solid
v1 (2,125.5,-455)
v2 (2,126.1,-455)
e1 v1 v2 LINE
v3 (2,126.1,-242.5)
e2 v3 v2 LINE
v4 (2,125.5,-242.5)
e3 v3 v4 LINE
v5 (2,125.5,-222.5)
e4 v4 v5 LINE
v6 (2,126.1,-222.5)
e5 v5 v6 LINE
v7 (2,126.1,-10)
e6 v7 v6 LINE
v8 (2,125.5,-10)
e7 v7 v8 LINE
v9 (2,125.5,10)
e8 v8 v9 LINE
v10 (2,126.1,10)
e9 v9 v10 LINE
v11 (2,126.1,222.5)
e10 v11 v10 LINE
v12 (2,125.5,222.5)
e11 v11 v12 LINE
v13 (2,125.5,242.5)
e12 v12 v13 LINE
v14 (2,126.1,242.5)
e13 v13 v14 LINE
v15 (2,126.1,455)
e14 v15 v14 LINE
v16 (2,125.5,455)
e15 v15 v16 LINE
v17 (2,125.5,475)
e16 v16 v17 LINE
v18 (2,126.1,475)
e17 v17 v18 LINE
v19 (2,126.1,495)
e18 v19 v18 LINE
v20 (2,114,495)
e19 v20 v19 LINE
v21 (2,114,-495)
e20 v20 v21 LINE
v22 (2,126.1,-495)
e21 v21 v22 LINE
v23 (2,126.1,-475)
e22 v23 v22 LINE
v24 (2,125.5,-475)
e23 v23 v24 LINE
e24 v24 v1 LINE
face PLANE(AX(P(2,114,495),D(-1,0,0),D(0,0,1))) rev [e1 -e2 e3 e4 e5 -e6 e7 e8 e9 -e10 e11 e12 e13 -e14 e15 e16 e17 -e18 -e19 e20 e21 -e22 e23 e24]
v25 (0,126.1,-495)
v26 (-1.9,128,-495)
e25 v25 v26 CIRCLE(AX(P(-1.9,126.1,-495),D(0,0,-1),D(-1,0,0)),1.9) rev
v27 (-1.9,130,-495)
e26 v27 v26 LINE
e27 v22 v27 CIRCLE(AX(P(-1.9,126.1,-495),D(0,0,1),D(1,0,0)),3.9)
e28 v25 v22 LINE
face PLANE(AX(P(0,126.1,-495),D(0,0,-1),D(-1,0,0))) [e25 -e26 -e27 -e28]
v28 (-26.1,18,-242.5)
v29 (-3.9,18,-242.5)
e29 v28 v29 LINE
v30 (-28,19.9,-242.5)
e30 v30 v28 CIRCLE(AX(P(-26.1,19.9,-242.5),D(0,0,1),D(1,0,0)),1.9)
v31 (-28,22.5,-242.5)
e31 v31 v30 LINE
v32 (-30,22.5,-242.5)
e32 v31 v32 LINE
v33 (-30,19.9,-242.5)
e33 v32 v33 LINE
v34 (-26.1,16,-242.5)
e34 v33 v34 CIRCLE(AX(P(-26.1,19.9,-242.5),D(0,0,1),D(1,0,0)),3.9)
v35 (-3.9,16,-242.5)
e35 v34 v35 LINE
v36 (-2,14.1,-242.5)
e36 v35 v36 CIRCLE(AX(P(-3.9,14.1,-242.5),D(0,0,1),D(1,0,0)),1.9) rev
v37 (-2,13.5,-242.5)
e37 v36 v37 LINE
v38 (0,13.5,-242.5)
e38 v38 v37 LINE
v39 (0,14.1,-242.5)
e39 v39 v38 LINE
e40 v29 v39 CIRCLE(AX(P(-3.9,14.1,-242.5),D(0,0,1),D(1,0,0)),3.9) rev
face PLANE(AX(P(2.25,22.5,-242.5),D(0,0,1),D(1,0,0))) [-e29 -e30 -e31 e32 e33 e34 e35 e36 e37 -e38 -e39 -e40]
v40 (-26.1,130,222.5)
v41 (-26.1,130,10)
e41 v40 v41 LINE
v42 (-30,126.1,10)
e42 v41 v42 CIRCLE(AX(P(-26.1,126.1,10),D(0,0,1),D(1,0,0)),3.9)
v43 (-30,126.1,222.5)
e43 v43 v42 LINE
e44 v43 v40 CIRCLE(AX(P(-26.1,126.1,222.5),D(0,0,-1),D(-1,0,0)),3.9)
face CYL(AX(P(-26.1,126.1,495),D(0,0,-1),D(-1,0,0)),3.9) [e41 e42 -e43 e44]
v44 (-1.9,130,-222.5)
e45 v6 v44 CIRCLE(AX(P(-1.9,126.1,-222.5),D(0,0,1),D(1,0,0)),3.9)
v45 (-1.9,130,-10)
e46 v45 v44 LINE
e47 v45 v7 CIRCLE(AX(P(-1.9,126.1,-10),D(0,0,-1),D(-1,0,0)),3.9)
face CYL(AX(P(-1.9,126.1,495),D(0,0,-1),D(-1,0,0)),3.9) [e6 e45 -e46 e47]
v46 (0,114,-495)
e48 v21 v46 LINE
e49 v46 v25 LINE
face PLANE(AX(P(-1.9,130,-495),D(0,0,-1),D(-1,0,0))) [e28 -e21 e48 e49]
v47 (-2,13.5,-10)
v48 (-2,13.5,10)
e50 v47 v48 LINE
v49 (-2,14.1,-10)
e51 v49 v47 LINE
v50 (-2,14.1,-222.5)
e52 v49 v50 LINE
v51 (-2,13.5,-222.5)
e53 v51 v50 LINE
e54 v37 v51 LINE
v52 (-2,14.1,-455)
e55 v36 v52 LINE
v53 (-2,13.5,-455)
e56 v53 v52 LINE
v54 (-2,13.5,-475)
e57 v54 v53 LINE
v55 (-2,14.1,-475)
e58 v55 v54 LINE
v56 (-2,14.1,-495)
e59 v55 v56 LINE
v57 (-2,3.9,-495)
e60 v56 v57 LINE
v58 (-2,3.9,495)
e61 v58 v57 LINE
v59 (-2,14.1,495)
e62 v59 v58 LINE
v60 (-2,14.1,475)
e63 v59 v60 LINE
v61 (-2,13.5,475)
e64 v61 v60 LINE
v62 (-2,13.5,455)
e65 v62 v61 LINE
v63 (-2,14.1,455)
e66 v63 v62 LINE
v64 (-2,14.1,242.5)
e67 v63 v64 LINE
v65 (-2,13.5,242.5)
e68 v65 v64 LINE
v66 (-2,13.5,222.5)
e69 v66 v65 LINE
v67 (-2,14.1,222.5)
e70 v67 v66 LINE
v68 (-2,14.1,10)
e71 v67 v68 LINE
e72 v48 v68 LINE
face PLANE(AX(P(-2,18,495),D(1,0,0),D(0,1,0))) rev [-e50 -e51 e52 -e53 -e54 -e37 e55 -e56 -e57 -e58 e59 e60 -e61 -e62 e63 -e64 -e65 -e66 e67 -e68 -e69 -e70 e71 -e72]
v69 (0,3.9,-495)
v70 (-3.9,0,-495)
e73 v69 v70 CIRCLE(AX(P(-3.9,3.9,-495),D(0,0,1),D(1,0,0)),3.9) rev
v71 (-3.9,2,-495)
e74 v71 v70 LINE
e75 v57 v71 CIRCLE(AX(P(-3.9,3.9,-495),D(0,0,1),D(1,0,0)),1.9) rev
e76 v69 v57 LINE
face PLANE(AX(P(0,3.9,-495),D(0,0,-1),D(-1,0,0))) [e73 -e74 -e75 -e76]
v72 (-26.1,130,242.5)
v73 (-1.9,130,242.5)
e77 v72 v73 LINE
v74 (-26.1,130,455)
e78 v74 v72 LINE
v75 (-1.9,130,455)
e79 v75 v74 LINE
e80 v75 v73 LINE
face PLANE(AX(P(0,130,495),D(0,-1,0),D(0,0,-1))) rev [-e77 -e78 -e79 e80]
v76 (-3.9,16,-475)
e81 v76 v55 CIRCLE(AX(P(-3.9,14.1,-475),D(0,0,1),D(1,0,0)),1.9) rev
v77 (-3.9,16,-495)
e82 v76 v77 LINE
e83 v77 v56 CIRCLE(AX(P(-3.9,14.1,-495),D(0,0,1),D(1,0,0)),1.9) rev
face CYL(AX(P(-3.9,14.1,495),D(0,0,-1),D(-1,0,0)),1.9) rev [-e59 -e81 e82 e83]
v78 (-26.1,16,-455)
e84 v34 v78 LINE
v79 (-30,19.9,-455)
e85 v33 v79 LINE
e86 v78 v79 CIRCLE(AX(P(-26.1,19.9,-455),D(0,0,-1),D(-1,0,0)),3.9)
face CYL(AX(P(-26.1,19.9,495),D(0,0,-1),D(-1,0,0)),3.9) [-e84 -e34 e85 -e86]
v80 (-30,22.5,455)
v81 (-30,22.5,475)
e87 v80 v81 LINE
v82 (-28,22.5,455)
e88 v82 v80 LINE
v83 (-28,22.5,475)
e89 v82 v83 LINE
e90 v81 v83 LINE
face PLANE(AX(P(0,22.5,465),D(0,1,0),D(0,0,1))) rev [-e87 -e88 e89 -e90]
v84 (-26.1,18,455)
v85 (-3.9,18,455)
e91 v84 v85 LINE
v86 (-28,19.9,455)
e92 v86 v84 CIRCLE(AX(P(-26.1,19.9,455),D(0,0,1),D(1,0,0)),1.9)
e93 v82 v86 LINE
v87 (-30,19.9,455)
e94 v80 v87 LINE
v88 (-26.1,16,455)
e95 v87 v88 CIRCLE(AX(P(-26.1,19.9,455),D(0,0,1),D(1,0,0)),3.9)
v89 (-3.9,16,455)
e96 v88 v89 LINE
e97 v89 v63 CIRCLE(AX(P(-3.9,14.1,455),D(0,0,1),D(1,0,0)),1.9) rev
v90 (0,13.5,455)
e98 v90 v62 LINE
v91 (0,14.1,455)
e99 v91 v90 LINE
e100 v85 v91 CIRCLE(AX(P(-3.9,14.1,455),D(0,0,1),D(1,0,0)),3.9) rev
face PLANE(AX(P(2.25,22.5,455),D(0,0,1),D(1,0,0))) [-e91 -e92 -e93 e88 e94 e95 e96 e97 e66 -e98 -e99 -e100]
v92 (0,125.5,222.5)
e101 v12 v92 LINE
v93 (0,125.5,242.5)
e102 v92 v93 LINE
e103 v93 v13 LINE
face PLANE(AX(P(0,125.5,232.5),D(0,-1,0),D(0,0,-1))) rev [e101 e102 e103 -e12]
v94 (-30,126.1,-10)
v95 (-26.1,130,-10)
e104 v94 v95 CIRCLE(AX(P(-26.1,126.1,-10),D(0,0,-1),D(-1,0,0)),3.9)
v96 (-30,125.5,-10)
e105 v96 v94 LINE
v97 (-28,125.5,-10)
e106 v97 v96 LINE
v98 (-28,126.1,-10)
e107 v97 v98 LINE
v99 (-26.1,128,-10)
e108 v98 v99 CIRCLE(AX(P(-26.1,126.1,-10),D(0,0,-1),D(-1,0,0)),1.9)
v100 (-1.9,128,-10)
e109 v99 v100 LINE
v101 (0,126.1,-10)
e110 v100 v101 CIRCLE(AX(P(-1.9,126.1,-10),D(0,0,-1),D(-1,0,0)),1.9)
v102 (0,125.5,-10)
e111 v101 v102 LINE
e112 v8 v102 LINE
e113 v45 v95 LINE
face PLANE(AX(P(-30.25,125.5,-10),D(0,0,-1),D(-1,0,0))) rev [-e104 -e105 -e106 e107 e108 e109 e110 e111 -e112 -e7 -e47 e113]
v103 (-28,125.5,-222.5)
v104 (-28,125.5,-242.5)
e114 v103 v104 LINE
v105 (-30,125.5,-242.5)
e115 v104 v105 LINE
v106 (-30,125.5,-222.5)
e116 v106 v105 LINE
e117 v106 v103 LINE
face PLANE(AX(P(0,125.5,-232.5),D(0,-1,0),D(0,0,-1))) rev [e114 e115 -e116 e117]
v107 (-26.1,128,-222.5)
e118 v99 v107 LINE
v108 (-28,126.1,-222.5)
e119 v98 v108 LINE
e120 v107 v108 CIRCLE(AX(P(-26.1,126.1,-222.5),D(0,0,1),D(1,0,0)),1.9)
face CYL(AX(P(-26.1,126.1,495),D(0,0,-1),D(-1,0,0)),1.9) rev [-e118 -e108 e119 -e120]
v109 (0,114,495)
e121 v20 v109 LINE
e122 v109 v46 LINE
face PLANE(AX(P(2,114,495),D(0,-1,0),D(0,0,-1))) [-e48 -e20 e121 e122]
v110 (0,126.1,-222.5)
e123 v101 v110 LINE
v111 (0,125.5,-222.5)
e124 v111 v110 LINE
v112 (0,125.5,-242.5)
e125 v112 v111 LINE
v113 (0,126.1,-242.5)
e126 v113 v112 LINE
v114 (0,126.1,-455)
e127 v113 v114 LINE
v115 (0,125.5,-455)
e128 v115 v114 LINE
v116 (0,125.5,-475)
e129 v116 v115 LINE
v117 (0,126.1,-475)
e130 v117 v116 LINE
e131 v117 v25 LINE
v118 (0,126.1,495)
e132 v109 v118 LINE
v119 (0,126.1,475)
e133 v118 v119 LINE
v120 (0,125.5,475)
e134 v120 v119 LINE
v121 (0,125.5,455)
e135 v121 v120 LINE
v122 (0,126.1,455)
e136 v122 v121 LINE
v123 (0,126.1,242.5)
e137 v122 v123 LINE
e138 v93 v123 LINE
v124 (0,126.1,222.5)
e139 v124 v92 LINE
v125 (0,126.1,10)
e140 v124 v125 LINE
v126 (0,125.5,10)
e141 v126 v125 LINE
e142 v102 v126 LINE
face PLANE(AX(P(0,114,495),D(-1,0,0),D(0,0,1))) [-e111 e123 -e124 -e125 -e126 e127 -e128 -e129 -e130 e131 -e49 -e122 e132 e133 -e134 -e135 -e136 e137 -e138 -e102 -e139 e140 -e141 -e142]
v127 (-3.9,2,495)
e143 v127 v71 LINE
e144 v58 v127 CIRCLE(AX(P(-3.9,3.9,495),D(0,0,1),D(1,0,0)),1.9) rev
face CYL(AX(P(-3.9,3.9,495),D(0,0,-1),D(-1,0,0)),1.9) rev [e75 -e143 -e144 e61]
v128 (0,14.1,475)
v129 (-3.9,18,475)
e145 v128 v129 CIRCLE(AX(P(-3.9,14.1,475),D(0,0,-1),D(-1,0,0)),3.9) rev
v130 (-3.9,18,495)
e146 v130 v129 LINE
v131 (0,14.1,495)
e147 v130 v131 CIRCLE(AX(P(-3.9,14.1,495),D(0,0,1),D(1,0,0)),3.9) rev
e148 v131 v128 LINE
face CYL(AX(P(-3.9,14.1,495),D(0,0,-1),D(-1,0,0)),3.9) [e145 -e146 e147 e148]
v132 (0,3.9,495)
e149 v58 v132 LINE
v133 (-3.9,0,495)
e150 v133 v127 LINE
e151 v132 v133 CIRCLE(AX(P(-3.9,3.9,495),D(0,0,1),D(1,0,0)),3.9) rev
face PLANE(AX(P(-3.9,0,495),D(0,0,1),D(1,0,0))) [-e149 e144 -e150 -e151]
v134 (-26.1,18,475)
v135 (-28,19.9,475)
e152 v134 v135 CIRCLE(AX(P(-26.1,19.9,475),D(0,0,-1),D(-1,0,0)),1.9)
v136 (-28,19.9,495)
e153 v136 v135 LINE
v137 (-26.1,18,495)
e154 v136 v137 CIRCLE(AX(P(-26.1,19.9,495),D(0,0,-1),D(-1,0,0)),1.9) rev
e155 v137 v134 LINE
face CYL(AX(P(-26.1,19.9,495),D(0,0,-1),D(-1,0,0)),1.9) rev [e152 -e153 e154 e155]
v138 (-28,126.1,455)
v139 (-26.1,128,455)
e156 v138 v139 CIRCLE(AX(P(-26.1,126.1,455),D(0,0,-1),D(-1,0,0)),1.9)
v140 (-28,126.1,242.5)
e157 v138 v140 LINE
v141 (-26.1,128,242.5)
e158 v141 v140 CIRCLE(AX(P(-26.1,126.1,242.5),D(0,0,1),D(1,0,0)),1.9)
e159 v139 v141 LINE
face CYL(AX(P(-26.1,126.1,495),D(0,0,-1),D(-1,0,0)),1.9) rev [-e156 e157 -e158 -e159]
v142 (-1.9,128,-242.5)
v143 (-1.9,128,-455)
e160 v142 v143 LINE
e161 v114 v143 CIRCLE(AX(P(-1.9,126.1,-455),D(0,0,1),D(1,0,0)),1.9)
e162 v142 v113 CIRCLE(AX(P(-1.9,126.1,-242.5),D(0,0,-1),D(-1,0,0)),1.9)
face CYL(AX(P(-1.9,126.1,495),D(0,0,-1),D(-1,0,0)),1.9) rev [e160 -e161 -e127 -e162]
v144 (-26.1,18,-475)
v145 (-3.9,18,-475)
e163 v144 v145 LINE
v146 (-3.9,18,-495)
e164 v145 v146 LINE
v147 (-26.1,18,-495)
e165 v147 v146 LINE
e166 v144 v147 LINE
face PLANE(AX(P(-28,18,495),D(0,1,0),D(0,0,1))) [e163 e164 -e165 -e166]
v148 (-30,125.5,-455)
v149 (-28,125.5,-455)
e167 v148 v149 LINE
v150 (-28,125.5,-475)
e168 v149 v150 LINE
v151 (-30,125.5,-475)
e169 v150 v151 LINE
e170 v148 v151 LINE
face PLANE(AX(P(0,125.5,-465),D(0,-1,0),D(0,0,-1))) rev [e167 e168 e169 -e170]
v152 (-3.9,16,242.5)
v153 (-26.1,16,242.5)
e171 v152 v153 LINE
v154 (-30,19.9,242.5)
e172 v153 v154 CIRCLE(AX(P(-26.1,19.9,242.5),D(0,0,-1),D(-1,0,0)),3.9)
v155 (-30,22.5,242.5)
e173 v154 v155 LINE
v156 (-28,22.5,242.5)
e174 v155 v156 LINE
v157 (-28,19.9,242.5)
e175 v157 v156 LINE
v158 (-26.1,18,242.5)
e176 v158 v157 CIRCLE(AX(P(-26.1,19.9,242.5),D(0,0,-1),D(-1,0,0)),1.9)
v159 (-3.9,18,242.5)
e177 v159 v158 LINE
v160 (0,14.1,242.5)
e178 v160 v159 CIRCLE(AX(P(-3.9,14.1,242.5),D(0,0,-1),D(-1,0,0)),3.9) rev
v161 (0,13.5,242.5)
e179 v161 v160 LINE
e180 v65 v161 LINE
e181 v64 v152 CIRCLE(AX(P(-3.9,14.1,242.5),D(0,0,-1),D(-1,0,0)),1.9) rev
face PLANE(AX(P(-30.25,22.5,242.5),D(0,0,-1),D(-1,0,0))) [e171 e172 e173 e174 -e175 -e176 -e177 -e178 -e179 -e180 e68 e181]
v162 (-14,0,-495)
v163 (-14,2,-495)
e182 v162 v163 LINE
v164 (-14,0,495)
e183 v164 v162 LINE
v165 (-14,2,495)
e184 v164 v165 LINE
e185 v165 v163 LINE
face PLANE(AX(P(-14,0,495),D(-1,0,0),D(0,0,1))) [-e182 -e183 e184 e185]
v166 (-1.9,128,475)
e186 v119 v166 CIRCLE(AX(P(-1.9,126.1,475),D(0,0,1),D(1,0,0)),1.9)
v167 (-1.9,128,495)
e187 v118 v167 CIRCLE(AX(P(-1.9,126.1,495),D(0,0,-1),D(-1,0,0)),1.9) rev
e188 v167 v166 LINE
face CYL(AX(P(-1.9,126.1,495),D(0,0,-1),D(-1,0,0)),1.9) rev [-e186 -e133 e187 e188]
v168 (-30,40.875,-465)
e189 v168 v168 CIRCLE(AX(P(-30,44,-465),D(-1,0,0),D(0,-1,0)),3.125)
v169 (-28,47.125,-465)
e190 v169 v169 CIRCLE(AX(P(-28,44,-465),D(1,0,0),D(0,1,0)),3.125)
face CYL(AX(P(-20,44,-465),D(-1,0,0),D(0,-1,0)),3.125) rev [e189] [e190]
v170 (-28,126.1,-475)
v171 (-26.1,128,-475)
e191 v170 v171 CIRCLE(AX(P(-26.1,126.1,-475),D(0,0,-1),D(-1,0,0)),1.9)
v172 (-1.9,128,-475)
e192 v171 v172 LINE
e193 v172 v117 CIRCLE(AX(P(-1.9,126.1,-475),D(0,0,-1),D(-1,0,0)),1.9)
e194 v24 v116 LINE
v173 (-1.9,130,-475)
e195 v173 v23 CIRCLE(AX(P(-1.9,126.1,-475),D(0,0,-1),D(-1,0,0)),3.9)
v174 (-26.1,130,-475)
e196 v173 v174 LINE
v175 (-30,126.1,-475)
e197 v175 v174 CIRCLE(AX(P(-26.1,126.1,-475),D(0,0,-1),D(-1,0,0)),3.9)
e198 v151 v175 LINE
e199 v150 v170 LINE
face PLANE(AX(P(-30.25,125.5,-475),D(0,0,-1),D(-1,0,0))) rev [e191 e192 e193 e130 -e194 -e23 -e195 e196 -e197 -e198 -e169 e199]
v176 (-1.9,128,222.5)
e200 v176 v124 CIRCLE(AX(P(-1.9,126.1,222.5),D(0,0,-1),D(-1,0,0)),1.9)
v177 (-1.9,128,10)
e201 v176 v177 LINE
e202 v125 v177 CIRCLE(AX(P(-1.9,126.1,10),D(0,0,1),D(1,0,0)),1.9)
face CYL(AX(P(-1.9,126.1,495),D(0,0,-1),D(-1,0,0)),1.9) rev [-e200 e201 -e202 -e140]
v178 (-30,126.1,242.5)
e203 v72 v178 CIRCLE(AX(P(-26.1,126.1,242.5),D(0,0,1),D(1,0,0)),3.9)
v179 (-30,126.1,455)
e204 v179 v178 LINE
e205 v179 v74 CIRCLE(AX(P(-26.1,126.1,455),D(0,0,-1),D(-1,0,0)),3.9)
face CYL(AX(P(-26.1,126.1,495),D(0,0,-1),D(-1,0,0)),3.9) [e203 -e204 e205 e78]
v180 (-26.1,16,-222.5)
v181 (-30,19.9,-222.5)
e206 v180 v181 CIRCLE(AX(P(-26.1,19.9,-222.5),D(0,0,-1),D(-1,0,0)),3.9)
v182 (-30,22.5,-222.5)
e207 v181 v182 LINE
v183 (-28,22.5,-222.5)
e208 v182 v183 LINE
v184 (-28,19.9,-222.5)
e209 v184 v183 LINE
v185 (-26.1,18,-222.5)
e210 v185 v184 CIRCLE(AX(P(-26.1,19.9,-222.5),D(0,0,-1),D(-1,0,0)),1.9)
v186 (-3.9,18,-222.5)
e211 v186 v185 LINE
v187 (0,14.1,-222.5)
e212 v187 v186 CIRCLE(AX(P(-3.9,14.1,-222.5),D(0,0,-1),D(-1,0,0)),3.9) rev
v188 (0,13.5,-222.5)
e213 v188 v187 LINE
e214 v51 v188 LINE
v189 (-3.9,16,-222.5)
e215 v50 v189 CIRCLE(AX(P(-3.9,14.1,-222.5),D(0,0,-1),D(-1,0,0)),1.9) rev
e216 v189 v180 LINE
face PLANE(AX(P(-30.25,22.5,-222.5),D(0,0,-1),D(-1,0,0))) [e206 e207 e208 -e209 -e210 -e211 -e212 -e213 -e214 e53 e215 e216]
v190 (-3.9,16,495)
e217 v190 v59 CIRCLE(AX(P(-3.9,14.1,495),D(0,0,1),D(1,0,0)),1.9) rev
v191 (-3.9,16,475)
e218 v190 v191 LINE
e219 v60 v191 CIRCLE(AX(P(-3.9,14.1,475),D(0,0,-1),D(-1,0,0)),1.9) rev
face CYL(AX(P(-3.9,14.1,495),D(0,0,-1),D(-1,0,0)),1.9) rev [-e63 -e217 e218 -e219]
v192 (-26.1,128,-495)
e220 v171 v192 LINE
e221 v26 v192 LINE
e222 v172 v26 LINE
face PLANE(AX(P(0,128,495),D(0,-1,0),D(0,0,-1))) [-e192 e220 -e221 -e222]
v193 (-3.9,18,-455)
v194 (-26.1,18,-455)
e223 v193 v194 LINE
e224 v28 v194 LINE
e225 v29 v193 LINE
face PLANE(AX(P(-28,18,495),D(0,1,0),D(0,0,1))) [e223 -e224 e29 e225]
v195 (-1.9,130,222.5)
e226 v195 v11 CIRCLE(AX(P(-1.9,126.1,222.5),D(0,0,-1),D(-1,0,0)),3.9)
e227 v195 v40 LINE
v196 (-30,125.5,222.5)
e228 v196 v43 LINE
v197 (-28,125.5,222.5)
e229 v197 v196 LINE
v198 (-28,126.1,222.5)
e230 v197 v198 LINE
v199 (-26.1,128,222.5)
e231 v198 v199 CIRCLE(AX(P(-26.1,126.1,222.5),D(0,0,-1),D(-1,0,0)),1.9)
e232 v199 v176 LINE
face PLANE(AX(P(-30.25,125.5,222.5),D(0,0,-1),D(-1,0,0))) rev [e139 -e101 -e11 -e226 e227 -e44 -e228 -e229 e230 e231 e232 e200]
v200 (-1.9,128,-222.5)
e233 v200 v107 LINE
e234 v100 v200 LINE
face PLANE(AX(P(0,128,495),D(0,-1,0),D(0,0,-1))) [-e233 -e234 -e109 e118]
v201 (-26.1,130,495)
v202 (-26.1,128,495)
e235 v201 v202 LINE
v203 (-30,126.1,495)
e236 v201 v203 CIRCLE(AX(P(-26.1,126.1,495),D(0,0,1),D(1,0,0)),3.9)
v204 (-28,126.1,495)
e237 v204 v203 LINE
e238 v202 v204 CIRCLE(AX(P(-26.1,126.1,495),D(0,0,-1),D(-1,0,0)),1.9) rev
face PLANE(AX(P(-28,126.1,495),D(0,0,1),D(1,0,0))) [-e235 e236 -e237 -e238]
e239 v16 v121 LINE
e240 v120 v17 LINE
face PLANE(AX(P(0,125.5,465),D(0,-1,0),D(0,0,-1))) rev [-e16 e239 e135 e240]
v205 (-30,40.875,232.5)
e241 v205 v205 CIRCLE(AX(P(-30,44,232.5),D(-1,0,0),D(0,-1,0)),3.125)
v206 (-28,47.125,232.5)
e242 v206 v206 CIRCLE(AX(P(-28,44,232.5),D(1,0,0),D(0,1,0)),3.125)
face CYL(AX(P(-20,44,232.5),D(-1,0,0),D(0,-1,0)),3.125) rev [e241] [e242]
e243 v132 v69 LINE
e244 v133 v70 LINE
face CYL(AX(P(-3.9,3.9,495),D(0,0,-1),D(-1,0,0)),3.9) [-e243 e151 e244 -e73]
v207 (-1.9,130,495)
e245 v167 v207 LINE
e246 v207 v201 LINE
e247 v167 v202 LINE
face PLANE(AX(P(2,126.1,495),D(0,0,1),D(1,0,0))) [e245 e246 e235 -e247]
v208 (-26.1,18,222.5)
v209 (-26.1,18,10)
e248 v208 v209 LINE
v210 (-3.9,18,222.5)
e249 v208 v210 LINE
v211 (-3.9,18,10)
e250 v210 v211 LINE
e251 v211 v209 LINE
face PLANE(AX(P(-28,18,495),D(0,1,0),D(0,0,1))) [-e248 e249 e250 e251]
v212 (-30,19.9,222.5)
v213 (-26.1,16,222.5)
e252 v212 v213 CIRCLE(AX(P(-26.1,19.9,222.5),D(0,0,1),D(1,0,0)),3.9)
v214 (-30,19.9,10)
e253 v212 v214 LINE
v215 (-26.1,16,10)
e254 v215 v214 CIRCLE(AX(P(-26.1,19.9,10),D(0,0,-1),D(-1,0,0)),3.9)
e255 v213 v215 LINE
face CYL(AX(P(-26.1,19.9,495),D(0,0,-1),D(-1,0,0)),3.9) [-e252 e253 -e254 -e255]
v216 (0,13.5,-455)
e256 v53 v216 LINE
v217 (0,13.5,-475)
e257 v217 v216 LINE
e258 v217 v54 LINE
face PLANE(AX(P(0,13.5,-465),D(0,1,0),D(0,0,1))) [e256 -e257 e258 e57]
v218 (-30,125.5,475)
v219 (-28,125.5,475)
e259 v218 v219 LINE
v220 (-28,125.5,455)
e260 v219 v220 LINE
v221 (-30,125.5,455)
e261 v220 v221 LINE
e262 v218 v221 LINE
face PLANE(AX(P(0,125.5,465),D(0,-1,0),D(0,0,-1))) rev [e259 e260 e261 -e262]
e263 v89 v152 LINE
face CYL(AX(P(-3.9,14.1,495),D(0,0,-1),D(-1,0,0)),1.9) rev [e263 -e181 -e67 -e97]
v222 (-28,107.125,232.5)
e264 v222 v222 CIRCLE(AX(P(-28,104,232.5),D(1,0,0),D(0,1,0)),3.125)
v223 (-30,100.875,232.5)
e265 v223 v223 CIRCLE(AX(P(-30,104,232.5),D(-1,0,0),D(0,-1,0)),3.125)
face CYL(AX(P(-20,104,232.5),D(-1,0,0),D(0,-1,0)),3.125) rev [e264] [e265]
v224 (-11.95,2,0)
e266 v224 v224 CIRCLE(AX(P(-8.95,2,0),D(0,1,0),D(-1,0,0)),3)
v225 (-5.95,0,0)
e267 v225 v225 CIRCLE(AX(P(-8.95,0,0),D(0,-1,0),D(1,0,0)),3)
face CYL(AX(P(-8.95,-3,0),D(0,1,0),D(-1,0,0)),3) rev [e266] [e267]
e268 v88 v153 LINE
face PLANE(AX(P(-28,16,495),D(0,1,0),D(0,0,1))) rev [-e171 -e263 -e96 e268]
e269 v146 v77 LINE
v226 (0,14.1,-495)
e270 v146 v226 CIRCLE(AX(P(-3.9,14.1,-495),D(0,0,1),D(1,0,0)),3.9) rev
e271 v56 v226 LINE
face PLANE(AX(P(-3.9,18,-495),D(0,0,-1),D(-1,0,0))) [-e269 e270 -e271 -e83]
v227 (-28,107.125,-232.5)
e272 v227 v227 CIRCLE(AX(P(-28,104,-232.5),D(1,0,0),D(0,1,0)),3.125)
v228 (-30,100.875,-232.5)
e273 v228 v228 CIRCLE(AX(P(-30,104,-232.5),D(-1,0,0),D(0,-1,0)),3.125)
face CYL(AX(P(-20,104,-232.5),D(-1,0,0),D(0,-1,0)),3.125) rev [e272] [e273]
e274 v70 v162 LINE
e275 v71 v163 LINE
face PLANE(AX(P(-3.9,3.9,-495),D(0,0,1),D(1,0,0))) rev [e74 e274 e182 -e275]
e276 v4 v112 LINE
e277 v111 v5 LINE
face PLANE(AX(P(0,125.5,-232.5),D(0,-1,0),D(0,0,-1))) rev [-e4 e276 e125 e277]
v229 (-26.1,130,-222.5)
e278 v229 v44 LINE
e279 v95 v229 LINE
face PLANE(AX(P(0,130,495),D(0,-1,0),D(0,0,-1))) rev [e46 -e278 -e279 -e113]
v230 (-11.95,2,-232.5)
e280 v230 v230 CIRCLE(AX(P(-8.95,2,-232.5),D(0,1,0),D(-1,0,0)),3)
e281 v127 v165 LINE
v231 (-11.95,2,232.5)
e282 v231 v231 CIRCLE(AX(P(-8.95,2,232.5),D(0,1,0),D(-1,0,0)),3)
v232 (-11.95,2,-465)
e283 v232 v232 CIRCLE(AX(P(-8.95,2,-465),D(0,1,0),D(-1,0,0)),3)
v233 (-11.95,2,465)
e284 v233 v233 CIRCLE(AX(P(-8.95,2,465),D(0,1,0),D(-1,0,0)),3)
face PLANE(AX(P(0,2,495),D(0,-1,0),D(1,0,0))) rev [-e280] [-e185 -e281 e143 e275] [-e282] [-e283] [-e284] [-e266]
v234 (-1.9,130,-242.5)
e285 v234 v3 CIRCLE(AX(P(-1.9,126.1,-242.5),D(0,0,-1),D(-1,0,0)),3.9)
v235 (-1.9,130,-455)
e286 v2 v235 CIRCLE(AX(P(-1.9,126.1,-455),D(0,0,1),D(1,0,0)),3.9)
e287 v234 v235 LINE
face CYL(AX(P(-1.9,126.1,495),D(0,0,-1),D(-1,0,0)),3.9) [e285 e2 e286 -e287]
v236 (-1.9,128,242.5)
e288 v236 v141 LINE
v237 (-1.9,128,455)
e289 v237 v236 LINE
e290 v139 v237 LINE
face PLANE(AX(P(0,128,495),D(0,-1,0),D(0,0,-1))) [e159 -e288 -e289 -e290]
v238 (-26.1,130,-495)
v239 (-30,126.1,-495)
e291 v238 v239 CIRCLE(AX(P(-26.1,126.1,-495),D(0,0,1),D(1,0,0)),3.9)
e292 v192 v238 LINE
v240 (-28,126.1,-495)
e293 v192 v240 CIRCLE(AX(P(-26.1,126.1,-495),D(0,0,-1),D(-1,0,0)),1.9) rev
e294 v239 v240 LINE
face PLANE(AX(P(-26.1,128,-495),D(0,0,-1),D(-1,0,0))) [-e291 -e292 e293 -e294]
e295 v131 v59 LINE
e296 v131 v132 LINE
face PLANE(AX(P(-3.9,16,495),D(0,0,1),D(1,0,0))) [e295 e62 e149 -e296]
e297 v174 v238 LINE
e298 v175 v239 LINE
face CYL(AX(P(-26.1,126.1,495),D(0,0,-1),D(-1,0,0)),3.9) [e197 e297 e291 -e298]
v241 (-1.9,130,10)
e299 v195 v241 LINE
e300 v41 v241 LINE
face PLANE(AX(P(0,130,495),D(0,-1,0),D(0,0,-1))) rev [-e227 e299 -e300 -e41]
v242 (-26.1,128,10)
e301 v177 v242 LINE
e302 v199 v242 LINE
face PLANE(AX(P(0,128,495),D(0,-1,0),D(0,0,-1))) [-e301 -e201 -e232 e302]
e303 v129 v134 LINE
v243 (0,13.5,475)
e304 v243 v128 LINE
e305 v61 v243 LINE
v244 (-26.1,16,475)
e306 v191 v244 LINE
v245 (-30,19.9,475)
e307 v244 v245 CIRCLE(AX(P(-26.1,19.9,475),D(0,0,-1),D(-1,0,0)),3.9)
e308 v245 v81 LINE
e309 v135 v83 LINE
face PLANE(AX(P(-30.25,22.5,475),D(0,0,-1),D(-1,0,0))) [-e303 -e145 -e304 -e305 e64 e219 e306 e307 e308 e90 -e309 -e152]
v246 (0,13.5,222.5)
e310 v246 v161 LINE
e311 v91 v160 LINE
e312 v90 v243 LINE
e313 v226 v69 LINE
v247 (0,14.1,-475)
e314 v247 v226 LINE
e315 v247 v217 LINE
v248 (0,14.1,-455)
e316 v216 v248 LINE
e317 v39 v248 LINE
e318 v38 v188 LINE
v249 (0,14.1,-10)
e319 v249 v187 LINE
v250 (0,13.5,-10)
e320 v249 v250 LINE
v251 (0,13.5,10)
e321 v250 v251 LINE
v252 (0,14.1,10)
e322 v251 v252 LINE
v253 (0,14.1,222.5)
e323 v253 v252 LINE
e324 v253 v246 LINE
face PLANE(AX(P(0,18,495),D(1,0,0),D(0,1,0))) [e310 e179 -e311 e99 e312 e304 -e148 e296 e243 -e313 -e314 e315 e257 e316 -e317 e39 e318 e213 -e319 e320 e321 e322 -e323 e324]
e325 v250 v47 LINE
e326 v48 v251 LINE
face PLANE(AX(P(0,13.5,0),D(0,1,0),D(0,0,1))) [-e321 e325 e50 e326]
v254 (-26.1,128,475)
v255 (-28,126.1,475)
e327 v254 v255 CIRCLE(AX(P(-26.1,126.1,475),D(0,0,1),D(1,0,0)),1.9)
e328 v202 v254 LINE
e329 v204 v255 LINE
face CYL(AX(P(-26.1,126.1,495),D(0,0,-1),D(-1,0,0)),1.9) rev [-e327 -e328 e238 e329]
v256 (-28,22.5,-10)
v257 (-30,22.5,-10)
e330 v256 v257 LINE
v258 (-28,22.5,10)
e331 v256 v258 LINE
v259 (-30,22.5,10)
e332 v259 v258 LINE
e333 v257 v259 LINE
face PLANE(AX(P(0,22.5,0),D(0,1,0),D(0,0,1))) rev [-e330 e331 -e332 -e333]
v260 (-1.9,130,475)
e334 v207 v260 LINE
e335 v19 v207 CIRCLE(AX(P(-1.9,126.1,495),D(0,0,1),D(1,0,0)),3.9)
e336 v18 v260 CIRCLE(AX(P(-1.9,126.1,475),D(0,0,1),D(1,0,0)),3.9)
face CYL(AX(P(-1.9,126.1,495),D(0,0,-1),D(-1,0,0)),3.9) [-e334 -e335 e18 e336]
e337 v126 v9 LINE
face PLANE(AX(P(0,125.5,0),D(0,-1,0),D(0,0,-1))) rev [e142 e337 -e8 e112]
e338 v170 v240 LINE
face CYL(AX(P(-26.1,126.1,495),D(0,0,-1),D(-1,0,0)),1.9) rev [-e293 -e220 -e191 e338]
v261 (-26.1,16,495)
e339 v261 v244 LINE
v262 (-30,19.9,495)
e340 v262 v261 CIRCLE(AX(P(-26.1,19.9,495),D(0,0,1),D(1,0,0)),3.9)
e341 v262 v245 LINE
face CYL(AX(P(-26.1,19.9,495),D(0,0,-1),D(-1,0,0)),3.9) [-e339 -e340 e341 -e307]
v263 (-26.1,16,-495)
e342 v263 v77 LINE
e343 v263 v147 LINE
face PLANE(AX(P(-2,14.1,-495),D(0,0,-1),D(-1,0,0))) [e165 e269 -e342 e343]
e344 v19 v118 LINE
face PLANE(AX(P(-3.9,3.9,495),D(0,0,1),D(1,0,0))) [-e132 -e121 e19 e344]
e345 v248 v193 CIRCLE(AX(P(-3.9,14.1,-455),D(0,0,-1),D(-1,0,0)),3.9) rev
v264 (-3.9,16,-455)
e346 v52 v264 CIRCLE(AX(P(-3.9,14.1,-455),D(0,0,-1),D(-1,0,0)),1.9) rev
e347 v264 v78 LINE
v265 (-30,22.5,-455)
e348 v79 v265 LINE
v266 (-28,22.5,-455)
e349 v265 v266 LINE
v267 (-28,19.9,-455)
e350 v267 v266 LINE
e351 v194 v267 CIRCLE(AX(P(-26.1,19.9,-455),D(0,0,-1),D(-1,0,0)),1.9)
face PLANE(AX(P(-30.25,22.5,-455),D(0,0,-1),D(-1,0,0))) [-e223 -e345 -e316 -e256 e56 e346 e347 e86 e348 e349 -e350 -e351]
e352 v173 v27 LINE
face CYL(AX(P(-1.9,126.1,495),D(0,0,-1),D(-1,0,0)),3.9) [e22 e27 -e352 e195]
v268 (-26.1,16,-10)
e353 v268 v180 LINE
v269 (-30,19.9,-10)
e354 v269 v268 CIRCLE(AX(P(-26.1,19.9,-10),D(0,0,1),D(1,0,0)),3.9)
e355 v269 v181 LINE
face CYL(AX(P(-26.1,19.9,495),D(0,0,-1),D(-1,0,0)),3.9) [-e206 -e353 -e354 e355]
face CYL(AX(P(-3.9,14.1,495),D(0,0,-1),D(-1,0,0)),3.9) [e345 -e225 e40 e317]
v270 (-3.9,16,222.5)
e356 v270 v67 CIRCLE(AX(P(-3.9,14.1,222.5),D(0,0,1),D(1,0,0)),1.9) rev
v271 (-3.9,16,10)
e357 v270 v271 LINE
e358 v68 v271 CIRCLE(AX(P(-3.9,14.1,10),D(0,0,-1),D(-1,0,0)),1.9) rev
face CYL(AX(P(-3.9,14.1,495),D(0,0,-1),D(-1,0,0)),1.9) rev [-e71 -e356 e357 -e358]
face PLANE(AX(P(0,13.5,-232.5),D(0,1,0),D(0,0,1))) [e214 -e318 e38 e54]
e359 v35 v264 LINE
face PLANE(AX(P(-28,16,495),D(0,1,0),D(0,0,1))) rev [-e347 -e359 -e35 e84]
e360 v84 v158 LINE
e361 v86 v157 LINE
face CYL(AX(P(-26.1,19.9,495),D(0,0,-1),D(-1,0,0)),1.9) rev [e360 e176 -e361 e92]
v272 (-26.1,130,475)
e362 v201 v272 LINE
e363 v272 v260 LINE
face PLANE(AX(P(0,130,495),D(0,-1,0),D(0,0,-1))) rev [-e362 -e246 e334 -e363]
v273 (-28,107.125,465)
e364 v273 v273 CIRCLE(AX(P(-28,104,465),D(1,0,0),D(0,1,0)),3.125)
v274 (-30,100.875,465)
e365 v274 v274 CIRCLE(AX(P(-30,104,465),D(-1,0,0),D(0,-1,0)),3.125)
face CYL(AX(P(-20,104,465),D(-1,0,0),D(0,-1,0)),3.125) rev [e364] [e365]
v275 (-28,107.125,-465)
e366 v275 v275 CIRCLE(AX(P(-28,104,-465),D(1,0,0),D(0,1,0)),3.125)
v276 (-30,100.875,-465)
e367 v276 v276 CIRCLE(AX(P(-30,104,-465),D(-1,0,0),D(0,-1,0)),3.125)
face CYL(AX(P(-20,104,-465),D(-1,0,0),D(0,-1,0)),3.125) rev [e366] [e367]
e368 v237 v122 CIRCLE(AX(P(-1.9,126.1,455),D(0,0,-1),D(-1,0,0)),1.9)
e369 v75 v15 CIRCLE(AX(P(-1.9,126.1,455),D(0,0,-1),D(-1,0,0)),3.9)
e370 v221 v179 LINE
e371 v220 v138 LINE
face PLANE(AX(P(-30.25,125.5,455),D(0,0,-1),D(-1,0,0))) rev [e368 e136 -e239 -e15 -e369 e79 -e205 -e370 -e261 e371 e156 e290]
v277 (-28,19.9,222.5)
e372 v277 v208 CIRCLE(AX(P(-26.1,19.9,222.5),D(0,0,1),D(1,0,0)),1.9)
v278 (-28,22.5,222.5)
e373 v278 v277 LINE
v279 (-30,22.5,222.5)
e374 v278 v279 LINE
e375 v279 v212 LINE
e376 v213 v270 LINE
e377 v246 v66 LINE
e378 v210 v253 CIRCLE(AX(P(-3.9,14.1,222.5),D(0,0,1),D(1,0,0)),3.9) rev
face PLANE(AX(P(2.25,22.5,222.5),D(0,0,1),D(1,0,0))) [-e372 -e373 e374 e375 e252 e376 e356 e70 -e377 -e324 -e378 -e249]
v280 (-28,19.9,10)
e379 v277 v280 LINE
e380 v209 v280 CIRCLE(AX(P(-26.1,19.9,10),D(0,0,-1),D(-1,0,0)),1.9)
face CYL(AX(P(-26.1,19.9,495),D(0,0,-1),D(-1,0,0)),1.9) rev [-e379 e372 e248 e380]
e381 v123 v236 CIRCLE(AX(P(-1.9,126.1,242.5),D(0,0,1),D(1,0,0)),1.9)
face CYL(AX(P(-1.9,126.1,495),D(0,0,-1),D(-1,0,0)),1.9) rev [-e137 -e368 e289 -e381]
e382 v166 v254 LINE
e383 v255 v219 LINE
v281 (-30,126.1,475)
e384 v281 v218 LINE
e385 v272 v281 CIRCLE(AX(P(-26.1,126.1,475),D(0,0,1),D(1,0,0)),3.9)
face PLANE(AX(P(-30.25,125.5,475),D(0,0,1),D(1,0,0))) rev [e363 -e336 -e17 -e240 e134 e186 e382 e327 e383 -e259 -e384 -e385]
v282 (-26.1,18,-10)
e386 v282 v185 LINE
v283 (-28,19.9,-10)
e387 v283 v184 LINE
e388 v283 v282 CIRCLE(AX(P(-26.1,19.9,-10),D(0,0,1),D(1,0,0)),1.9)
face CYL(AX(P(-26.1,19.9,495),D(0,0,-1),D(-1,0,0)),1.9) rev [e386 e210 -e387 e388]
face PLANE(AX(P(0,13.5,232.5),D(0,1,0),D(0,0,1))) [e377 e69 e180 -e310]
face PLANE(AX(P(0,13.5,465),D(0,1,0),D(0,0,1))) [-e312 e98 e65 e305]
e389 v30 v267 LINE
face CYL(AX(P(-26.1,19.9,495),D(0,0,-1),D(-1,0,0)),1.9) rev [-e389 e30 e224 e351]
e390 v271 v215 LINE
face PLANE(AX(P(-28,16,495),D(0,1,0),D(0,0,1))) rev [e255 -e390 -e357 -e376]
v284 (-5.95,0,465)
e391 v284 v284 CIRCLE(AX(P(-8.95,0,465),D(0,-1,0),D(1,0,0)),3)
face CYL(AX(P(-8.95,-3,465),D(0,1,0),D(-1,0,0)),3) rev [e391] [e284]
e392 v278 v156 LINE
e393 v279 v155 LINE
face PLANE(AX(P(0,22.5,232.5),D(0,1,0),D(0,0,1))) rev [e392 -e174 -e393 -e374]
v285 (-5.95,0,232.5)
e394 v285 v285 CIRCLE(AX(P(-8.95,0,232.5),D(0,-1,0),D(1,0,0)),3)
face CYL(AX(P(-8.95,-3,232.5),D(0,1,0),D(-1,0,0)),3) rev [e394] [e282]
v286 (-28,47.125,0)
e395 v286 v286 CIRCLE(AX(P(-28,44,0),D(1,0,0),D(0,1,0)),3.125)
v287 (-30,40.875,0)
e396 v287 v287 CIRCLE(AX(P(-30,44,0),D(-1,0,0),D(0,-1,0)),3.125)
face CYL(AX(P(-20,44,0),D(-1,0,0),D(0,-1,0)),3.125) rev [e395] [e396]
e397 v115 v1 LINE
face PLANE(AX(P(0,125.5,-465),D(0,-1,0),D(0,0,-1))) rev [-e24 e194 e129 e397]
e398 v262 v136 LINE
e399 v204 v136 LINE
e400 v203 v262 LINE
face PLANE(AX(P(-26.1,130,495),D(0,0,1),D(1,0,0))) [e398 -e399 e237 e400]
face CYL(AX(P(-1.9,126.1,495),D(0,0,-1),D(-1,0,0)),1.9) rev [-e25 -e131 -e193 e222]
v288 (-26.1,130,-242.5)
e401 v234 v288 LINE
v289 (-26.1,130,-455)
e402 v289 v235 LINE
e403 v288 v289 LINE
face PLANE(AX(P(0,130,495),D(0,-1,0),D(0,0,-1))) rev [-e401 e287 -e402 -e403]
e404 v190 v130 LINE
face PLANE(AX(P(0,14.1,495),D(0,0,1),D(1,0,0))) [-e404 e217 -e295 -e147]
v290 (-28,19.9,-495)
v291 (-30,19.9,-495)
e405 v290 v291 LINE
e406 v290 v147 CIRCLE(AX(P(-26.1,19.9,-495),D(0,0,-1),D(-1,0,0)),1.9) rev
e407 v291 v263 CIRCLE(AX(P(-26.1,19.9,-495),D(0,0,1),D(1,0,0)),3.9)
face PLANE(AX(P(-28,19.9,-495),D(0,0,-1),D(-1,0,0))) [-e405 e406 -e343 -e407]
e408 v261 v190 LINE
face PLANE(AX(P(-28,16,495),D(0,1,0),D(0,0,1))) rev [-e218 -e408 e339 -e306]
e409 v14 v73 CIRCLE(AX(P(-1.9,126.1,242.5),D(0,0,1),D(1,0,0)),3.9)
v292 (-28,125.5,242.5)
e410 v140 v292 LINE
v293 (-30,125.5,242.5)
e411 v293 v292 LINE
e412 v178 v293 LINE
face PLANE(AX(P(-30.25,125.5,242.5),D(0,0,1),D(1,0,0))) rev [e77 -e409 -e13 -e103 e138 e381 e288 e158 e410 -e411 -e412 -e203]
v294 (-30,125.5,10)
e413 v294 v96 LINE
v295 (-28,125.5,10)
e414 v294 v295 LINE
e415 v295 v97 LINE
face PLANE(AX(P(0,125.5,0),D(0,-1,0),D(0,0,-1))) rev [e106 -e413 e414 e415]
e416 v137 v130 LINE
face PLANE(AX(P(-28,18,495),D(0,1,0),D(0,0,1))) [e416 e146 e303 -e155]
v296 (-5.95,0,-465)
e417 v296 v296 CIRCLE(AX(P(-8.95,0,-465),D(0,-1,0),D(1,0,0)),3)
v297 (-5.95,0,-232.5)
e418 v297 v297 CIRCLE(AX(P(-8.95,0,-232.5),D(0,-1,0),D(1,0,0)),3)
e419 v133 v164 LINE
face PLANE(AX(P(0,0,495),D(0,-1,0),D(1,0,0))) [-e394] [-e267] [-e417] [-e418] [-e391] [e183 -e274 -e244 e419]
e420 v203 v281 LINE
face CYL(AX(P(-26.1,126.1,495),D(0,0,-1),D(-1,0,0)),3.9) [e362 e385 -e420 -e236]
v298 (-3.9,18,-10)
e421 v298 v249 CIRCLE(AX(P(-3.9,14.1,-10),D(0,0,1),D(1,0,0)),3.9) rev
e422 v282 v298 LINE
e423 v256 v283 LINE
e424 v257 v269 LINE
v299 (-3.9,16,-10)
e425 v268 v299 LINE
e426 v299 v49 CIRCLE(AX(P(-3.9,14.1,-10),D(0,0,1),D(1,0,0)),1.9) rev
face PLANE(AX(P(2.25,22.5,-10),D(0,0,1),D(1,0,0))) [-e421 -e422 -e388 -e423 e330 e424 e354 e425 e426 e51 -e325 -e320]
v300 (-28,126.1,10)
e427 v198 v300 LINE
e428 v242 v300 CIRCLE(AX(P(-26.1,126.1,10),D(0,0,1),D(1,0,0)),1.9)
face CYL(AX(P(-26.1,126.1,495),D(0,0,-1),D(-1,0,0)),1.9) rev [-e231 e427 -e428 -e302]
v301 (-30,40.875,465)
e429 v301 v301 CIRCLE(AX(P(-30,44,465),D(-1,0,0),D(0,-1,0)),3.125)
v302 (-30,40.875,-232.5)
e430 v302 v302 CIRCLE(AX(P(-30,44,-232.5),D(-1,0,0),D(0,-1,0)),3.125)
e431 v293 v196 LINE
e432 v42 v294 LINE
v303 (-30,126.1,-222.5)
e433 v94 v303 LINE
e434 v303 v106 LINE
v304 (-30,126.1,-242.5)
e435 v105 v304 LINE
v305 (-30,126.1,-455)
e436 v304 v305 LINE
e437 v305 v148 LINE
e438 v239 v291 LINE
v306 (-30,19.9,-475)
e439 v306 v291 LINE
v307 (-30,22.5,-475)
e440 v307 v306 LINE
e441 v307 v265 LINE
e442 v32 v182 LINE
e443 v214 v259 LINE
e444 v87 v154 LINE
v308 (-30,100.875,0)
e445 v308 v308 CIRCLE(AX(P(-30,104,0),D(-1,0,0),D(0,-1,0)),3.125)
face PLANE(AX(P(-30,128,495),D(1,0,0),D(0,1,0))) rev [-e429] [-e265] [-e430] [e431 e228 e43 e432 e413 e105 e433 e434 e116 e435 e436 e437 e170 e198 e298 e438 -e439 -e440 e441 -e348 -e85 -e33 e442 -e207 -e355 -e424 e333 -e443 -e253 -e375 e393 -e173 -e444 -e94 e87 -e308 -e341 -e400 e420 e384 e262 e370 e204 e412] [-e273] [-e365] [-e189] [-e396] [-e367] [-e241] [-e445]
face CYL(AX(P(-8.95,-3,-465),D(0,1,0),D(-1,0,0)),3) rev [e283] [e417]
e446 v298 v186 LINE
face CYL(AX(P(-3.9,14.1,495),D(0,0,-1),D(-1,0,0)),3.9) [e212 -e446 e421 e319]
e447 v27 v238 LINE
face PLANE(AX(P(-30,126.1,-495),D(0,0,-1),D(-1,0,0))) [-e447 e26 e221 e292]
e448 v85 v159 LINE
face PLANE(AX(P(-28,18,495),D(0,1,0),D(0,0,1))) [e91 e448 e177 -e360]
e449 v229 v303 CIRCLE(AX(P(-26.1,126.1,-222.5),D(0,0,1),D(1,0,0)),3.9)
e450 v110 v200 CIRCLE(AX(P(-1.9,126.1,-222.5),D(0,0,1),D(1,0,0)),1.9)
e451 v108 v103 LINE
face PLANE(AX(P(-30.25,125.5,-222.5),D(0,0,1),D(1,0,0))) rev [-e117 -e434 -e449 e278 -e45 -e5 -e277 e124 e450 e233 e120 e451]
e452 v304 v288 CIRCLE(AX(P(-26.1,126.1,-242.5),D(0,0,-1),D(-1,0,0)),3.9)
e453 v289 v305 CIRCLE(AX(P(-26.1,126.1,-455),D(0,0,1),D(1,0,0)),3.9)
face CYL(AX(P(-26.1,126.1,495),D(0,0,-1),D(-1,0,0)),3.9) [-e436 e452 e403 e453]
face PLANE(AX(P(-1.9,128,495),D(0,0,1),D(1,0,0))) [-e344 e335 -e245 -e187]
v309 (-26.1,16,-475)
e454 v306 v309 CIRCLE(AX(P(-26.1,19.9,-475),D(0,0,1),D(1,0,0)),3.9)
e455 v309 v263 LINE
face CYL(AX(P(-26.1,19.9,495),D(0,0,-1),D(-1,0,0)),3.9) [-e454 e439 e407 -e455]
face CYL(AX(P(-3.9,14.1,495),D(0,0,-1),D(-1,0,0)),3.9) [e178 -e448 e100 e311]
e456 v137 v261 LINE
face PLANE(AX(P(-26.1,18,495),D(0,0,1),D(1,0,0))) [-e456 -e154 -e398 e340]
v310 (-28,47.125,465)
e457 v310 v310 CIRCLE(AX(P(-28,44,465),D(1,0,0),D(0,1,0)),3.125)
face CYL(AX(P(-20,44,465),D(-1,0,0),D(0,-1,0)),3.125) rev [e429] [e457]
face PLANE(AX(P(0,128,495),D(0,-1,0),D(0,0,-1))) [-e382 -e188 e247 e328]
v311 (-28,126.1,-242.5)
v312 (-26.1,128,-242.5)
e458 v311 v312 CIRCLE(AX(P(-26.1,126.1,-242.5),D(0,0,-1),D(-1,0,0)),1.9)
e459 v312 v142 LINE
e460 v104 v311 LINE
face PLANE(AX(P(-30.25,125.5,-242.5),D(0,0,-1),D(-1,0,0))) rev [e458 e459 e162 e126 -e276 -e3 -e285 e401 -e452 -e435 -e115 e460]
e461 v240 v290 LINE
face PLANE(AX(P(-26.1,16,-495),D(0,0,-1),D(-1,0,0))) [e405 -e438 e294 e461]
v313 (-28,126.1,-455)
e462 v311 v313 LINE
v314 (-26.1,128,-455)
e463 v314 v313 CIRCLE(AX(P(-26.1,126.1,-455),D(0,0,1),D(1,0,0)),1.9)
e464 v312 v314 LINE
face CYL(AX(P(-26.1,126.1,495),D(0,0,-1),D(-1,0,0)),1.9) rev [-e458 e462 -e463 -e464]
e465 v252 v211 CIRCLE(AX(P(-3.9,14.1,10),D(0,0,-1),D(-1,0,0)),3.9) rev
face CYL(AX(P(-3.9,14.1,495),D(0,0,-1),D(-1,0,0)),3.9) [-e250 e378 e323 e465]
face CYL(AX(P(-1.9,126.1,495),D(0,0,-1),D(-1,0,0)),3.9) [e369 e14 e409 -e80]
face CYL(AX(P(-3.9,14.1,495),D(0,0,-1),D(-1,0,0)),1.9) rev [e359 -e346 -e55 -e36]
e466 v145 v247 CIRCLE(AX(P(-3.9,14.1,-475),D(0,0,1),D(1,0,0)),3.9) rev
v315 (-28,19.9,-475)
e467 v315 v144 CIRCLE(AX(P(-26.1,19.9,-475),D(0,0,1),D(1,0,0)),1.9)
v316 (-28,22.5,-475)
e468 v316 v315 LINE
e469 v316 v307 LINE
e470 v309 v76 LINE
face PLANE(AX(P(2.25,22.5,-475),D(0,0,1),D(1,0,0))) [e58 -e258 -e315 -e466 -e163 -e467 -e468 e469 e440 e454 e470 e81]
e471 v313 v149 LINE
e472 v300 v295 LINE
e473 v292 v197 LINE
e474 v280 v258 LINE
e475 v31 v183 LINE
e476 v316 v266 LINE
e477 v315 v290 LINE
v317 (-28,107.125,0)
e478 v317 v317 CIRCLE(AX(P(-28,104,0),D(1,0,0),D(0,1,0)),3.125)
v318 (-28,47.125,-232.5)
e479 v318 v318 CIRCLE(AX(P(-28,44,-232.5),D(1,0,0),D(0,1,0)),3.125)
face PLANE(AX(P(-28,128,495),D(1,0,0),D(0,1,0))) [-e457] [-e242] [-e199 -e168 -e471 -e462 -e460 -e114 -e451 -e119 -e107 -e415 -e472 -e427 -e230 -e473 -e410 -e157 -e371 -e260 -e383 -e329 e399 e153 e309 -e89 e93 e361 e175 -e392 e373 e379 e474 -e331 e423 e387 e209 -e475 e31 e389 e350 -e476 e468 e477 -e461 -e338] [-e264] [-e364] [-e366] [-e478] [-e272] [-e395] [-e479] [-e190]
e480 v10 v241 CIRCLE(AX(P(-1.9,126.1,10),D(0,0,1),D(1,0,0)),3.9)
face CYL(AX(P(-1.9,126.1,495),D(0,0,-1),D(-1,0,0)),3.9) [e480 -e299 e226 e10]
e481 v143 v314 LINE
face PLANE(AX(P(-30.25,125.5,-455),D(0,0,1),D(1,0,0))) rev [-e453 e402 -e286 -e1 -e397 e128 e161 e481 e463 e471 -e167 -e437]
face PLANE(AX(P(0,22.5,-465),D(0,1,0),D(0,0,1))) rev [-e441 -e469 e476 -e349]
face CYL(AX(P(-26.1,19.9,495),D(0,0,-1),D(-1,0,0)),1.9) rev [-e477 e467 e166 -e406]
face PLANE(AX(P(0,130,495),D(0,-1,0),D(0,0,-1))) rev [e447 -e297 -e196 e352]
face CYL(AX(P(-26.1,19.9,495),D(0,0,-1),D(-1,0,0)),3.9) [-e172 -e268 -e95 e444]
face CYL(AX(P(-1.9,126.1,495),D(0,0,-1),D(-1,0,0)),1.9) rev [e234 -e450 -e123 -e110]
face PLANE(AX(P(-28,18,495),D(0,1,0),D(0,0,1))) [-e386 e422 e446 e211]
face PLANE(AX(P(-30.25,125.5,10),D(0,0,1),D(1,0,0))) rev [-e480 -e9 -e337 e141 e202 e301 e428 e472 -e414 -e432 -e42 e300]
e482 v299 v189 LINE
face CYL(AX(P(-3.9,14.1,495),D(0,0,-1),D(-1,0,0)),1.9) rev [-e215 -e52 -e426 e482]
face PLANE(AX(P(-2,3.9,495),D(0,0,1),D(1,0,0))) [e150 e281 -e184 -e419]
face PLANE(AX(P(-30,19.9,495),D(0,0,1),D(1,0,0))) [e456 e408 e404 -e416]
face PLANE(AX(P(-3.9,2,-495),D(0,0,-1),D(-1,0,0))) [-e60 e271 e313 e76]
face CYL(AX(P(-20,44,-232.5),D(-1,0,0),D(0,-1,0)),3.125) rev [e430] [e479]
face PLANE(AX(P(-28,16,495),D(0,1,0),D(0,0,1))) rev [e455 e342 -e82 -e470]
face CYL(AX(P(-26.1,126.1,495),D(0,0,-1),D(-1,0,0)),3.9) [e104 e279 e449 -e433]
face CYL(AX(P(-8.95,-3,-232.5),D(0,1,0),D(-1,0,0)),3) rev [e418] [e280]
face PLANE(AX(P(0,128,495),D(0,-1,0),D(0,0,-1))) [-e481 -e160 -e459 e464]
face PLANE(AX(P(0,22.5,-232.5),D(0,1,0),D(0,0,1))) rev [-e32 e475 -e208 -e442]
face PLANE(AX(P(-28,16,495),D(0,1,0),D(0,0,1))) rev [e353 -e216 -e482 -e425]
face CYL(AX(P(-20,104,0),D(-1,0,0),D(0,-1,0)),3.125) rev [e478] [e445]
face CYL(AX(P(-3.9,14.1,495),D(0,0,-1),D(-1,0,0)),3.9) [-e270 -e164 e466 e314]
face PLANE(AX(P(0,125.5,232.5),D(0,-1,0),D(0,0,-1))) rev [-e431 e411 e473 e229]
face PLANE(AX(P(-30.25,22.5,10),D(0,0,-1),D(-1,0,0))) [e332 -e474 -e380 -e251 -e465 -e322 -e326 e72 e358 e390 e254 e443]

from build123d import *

# Parameters (mm, degrees)
BASE_FLANGE1_DEPTH  = 495
SKETCH6_W           = 32.5
SKETCH6_H           = 20
CUT_EXTRUDE1_DEPTH  = 4.5
LPATTERN1_COUNT     = 3
LPATTERN1_PITCH     = 232.5
LPATTERN1_COL_COUNT = 3
LPATTERN1_COL_PITCH = 232.5
SKETCH7_W           = 32.5
SKETCH7_H           = 20
CUT_EXTRUDE2_DEPTH  = 4.5
LPATTERN2_COUNT     = 3
LPATTERN2_PITCH     = 232.5
LPATTERN2_COL_COUNT = 3
LPATTERN2_COL_PITCH = 232.5
SKETCH8_R           = 3
CUT_EXTRUDE3_DEPTH  = 5
LPATTERN3_COUNT     = 3
LPATTERN3_PITCH     = 232.5
LPATTERN3_COL_COUNT = 3
LPATTERN3_COL_PITCH = 232.5
SKETCH9_R           = 3.125
CUT_EXTRUDE4_DEPTH  = 10
LPATTERN4_COUNT     = 3
LPATTERN4_PITCH     = 232.5
LPATTERN4_COL_COUNT = 3
LPATTERN4_COL_PITCH = 232.5


# Sheet-metal steps are written as plain solids
with BuildPart() as part:
    # Sketch1 → Base-Flange1 (new, symmetric)
    with BuildSketch(Plane.XY):
        with BuildLine():
            Line((0, 114), (0, 126.1))
            ThreePointArc((0, 126.1), (-0.556497116, 127.443502884), (-1.9, 128))
            Line((-1.9, 128), (-26.1, 128))
            ThreePointArc((-26.1, 128), (-27.443502884, 127.443502884), (-28, 126.1))
            Line((-28, 126.1), (-28, 19.9))
            ThreePointArc((-28, 19.9), (-27.443502884, 18.556497116), (-26.1, 18))
            Line((-26.1, 18), (-3.9, 18))
            ThreePointArc((-3.9, 18), (-1.142283553, 16.857716447), (0, 14.1))
            Line((0, 14.1), (0, 3.9))
            ThreePointArc((0, 3.9), (-1.142283553, 1.142283553), (-3.9, 0))
            Line((-3.9, 0), (-14, 0))
            Line((-14, 0), (-14, 2))
            Line((-14, 2), (-3.9, 2))
            ThreePointArc((-3.9, 2), (-2.556497116, 2.556497116), (-2, 3.9))
            Line((-2, 3.9), (-2, 14.1))
            ThreePointArc((-2, 14.1), (-2.556497116, 15.443502884), (-3.9, 16))
            Line((-3.9, 16), (-26.1, 16))
            ThreePointArc((-26.1, 16), (-28.857716447, 17.142283553), (-30, 19.9))
            Line((-30, 19.9), (-30, 126.1))
            ThreePointArc((-30, 126.1), (-28.857716447, 128.857716447), (-26.1, 130))
            Line((-26.1, 130), (-1.9, 130))
            ThreePointArc((-1.9, 130), (0.857716447, 128.857716447), (2, 126.1))
            Line((2, 126.1), (2, 114))
            Line((2, 114), (0, 114))
        make_face()
    extrude(amount=BASE_FLANGE1_DEPTH, both=True)

    # Sketch6 → Cut-Extrude1 (cut)
    with BuildSketch(Plane(origin=(0, 130, 0), x_dir=(1, 0, 0), z_dir=(0, 1, 0))):
        with Locations((-14, 0)):
            Rectangle(SKETCH6_W, SKETCH6_H)
    cut_extrude1 = extrude(amount=-CUT_EXTRUDE1_DEPTH, mode=Mode.SUBTRACT)

    # LPattern1: Cut-Extrude1 ×3
    with Locations(*[(0, 0, i * LPATTERN1_PITCH) for i in range(1, LPATTERN1_COUNT)]):
        add(cut_extrude1, mode=Mode.SUBTRACT)

    # LPattern1 col: Cut-Extrude1 ×3
    with Locations(*[(0, 0, -i * LPATTERN1_COL_PITCH) for i in range(1, LPATTERN1_COL_COUNT)]):
        add(cut_extrude1, mode=Mode.SUBTRACT)

    # Sketch7 → Cut-Extrude2 (cut, symmetric)
    with BuildSketch(Plane(origin=(0, 18, 0), x_dir=(1, 0, 0), z_dir=(0, 1, 0))):
        with Locations((-14, 0)):
            Rectangle(SKETCH7_W, SKETCH7_H)
    cut_extrude2 = extrude(amount=CUT_EXTRUDE2_DEPTH, both=True, mode=Mode.SUBTRACT)

    # LPattern2: Cut-Extrude2 ×3
    with Locations(*[(0, 0, -i * LPATTERN2_PITCH) for i in range(1, LPATTERN2_COUNT)]):
        add(cut_extrude2, mode=Mode.SUBTRACT)

    # LPattern2 col: Cut-Extrude2 ×3
    with Locations(*[(0, 0, i * LPATTERN2_COL_PITCH) for i in range(1, LPATTERN2_COL_COUNT)]):
        add(cut_extrude2, mode=Mode.SUBTRACT)

    # Sketch8 → Cut-Extrude3 (cut)
    with BuildSketch(Plane(origin=(0, 2, 0), x_dir=(1, 0, 0), z_dir=(0, 1, 0))):
        with Locations(Location((-8.95, 0, 0), (0, 0, 180))):
            Circle(SKETCH8_R)
    cut_extrude3 = extrude(amount=-CUT_EXTRUDE3_DEPTH, mode=Mode.SUBTRACT)

    # LPattern3: Cut-Extrude3 ×3
    with Locations(*[(0, 0, -i * LPATTERN3_PITCH) for i in range(1, LPATTERN3_COUNT)]):
        add(cut_extrude3, mode=Mode.SUBTRACT)

    # LPattern3 col: Cut-Extrude3 ×3
    with Locations(*[(0, 0, i * LPATTERN3_COL_PITCH) for i in range(1, LPATTERN3_COL_COUNT)]):
        add(cut_extrude3, mode=Mode.SUBTRACT)

    # Sketch9 → Cut-Extrude4 (cut)
    with BuildSketch(Plane.ZY.offset(30)):
        with Locations(Location((0, 104, 0), (0, 0, 270))):
            Circle(SKETCH9_R)
        with Locations(Location((0, 44, 0), (0, 0, 270))):
            Circle(SKETCH9_R)
    cut_extrude4 = extrude(amount=-CUT_EXTRUDE4_DEPTH, mode=Mode.SUBTRACT)

    # LPattern4: Cut-Extrude4 ×3
    with Locations(*[(0, 0, -i * LPATTERN4_PITCH) for i in range(1, LPATTERN4_COUNT)]):
        add(cut_extrude4, mode=Mode.SUBTRACT)

    # LPattern4 col: Cut-Extrude4 ×3
    with Locations(*[(0, 0, i * LPATTERN4_COL_PITCH) for i in range(1, LPATTERN4_COL_COUNT)]):
        add(cut_extrude4, mode=Mode.SUBTRACT)


solid = part.part
